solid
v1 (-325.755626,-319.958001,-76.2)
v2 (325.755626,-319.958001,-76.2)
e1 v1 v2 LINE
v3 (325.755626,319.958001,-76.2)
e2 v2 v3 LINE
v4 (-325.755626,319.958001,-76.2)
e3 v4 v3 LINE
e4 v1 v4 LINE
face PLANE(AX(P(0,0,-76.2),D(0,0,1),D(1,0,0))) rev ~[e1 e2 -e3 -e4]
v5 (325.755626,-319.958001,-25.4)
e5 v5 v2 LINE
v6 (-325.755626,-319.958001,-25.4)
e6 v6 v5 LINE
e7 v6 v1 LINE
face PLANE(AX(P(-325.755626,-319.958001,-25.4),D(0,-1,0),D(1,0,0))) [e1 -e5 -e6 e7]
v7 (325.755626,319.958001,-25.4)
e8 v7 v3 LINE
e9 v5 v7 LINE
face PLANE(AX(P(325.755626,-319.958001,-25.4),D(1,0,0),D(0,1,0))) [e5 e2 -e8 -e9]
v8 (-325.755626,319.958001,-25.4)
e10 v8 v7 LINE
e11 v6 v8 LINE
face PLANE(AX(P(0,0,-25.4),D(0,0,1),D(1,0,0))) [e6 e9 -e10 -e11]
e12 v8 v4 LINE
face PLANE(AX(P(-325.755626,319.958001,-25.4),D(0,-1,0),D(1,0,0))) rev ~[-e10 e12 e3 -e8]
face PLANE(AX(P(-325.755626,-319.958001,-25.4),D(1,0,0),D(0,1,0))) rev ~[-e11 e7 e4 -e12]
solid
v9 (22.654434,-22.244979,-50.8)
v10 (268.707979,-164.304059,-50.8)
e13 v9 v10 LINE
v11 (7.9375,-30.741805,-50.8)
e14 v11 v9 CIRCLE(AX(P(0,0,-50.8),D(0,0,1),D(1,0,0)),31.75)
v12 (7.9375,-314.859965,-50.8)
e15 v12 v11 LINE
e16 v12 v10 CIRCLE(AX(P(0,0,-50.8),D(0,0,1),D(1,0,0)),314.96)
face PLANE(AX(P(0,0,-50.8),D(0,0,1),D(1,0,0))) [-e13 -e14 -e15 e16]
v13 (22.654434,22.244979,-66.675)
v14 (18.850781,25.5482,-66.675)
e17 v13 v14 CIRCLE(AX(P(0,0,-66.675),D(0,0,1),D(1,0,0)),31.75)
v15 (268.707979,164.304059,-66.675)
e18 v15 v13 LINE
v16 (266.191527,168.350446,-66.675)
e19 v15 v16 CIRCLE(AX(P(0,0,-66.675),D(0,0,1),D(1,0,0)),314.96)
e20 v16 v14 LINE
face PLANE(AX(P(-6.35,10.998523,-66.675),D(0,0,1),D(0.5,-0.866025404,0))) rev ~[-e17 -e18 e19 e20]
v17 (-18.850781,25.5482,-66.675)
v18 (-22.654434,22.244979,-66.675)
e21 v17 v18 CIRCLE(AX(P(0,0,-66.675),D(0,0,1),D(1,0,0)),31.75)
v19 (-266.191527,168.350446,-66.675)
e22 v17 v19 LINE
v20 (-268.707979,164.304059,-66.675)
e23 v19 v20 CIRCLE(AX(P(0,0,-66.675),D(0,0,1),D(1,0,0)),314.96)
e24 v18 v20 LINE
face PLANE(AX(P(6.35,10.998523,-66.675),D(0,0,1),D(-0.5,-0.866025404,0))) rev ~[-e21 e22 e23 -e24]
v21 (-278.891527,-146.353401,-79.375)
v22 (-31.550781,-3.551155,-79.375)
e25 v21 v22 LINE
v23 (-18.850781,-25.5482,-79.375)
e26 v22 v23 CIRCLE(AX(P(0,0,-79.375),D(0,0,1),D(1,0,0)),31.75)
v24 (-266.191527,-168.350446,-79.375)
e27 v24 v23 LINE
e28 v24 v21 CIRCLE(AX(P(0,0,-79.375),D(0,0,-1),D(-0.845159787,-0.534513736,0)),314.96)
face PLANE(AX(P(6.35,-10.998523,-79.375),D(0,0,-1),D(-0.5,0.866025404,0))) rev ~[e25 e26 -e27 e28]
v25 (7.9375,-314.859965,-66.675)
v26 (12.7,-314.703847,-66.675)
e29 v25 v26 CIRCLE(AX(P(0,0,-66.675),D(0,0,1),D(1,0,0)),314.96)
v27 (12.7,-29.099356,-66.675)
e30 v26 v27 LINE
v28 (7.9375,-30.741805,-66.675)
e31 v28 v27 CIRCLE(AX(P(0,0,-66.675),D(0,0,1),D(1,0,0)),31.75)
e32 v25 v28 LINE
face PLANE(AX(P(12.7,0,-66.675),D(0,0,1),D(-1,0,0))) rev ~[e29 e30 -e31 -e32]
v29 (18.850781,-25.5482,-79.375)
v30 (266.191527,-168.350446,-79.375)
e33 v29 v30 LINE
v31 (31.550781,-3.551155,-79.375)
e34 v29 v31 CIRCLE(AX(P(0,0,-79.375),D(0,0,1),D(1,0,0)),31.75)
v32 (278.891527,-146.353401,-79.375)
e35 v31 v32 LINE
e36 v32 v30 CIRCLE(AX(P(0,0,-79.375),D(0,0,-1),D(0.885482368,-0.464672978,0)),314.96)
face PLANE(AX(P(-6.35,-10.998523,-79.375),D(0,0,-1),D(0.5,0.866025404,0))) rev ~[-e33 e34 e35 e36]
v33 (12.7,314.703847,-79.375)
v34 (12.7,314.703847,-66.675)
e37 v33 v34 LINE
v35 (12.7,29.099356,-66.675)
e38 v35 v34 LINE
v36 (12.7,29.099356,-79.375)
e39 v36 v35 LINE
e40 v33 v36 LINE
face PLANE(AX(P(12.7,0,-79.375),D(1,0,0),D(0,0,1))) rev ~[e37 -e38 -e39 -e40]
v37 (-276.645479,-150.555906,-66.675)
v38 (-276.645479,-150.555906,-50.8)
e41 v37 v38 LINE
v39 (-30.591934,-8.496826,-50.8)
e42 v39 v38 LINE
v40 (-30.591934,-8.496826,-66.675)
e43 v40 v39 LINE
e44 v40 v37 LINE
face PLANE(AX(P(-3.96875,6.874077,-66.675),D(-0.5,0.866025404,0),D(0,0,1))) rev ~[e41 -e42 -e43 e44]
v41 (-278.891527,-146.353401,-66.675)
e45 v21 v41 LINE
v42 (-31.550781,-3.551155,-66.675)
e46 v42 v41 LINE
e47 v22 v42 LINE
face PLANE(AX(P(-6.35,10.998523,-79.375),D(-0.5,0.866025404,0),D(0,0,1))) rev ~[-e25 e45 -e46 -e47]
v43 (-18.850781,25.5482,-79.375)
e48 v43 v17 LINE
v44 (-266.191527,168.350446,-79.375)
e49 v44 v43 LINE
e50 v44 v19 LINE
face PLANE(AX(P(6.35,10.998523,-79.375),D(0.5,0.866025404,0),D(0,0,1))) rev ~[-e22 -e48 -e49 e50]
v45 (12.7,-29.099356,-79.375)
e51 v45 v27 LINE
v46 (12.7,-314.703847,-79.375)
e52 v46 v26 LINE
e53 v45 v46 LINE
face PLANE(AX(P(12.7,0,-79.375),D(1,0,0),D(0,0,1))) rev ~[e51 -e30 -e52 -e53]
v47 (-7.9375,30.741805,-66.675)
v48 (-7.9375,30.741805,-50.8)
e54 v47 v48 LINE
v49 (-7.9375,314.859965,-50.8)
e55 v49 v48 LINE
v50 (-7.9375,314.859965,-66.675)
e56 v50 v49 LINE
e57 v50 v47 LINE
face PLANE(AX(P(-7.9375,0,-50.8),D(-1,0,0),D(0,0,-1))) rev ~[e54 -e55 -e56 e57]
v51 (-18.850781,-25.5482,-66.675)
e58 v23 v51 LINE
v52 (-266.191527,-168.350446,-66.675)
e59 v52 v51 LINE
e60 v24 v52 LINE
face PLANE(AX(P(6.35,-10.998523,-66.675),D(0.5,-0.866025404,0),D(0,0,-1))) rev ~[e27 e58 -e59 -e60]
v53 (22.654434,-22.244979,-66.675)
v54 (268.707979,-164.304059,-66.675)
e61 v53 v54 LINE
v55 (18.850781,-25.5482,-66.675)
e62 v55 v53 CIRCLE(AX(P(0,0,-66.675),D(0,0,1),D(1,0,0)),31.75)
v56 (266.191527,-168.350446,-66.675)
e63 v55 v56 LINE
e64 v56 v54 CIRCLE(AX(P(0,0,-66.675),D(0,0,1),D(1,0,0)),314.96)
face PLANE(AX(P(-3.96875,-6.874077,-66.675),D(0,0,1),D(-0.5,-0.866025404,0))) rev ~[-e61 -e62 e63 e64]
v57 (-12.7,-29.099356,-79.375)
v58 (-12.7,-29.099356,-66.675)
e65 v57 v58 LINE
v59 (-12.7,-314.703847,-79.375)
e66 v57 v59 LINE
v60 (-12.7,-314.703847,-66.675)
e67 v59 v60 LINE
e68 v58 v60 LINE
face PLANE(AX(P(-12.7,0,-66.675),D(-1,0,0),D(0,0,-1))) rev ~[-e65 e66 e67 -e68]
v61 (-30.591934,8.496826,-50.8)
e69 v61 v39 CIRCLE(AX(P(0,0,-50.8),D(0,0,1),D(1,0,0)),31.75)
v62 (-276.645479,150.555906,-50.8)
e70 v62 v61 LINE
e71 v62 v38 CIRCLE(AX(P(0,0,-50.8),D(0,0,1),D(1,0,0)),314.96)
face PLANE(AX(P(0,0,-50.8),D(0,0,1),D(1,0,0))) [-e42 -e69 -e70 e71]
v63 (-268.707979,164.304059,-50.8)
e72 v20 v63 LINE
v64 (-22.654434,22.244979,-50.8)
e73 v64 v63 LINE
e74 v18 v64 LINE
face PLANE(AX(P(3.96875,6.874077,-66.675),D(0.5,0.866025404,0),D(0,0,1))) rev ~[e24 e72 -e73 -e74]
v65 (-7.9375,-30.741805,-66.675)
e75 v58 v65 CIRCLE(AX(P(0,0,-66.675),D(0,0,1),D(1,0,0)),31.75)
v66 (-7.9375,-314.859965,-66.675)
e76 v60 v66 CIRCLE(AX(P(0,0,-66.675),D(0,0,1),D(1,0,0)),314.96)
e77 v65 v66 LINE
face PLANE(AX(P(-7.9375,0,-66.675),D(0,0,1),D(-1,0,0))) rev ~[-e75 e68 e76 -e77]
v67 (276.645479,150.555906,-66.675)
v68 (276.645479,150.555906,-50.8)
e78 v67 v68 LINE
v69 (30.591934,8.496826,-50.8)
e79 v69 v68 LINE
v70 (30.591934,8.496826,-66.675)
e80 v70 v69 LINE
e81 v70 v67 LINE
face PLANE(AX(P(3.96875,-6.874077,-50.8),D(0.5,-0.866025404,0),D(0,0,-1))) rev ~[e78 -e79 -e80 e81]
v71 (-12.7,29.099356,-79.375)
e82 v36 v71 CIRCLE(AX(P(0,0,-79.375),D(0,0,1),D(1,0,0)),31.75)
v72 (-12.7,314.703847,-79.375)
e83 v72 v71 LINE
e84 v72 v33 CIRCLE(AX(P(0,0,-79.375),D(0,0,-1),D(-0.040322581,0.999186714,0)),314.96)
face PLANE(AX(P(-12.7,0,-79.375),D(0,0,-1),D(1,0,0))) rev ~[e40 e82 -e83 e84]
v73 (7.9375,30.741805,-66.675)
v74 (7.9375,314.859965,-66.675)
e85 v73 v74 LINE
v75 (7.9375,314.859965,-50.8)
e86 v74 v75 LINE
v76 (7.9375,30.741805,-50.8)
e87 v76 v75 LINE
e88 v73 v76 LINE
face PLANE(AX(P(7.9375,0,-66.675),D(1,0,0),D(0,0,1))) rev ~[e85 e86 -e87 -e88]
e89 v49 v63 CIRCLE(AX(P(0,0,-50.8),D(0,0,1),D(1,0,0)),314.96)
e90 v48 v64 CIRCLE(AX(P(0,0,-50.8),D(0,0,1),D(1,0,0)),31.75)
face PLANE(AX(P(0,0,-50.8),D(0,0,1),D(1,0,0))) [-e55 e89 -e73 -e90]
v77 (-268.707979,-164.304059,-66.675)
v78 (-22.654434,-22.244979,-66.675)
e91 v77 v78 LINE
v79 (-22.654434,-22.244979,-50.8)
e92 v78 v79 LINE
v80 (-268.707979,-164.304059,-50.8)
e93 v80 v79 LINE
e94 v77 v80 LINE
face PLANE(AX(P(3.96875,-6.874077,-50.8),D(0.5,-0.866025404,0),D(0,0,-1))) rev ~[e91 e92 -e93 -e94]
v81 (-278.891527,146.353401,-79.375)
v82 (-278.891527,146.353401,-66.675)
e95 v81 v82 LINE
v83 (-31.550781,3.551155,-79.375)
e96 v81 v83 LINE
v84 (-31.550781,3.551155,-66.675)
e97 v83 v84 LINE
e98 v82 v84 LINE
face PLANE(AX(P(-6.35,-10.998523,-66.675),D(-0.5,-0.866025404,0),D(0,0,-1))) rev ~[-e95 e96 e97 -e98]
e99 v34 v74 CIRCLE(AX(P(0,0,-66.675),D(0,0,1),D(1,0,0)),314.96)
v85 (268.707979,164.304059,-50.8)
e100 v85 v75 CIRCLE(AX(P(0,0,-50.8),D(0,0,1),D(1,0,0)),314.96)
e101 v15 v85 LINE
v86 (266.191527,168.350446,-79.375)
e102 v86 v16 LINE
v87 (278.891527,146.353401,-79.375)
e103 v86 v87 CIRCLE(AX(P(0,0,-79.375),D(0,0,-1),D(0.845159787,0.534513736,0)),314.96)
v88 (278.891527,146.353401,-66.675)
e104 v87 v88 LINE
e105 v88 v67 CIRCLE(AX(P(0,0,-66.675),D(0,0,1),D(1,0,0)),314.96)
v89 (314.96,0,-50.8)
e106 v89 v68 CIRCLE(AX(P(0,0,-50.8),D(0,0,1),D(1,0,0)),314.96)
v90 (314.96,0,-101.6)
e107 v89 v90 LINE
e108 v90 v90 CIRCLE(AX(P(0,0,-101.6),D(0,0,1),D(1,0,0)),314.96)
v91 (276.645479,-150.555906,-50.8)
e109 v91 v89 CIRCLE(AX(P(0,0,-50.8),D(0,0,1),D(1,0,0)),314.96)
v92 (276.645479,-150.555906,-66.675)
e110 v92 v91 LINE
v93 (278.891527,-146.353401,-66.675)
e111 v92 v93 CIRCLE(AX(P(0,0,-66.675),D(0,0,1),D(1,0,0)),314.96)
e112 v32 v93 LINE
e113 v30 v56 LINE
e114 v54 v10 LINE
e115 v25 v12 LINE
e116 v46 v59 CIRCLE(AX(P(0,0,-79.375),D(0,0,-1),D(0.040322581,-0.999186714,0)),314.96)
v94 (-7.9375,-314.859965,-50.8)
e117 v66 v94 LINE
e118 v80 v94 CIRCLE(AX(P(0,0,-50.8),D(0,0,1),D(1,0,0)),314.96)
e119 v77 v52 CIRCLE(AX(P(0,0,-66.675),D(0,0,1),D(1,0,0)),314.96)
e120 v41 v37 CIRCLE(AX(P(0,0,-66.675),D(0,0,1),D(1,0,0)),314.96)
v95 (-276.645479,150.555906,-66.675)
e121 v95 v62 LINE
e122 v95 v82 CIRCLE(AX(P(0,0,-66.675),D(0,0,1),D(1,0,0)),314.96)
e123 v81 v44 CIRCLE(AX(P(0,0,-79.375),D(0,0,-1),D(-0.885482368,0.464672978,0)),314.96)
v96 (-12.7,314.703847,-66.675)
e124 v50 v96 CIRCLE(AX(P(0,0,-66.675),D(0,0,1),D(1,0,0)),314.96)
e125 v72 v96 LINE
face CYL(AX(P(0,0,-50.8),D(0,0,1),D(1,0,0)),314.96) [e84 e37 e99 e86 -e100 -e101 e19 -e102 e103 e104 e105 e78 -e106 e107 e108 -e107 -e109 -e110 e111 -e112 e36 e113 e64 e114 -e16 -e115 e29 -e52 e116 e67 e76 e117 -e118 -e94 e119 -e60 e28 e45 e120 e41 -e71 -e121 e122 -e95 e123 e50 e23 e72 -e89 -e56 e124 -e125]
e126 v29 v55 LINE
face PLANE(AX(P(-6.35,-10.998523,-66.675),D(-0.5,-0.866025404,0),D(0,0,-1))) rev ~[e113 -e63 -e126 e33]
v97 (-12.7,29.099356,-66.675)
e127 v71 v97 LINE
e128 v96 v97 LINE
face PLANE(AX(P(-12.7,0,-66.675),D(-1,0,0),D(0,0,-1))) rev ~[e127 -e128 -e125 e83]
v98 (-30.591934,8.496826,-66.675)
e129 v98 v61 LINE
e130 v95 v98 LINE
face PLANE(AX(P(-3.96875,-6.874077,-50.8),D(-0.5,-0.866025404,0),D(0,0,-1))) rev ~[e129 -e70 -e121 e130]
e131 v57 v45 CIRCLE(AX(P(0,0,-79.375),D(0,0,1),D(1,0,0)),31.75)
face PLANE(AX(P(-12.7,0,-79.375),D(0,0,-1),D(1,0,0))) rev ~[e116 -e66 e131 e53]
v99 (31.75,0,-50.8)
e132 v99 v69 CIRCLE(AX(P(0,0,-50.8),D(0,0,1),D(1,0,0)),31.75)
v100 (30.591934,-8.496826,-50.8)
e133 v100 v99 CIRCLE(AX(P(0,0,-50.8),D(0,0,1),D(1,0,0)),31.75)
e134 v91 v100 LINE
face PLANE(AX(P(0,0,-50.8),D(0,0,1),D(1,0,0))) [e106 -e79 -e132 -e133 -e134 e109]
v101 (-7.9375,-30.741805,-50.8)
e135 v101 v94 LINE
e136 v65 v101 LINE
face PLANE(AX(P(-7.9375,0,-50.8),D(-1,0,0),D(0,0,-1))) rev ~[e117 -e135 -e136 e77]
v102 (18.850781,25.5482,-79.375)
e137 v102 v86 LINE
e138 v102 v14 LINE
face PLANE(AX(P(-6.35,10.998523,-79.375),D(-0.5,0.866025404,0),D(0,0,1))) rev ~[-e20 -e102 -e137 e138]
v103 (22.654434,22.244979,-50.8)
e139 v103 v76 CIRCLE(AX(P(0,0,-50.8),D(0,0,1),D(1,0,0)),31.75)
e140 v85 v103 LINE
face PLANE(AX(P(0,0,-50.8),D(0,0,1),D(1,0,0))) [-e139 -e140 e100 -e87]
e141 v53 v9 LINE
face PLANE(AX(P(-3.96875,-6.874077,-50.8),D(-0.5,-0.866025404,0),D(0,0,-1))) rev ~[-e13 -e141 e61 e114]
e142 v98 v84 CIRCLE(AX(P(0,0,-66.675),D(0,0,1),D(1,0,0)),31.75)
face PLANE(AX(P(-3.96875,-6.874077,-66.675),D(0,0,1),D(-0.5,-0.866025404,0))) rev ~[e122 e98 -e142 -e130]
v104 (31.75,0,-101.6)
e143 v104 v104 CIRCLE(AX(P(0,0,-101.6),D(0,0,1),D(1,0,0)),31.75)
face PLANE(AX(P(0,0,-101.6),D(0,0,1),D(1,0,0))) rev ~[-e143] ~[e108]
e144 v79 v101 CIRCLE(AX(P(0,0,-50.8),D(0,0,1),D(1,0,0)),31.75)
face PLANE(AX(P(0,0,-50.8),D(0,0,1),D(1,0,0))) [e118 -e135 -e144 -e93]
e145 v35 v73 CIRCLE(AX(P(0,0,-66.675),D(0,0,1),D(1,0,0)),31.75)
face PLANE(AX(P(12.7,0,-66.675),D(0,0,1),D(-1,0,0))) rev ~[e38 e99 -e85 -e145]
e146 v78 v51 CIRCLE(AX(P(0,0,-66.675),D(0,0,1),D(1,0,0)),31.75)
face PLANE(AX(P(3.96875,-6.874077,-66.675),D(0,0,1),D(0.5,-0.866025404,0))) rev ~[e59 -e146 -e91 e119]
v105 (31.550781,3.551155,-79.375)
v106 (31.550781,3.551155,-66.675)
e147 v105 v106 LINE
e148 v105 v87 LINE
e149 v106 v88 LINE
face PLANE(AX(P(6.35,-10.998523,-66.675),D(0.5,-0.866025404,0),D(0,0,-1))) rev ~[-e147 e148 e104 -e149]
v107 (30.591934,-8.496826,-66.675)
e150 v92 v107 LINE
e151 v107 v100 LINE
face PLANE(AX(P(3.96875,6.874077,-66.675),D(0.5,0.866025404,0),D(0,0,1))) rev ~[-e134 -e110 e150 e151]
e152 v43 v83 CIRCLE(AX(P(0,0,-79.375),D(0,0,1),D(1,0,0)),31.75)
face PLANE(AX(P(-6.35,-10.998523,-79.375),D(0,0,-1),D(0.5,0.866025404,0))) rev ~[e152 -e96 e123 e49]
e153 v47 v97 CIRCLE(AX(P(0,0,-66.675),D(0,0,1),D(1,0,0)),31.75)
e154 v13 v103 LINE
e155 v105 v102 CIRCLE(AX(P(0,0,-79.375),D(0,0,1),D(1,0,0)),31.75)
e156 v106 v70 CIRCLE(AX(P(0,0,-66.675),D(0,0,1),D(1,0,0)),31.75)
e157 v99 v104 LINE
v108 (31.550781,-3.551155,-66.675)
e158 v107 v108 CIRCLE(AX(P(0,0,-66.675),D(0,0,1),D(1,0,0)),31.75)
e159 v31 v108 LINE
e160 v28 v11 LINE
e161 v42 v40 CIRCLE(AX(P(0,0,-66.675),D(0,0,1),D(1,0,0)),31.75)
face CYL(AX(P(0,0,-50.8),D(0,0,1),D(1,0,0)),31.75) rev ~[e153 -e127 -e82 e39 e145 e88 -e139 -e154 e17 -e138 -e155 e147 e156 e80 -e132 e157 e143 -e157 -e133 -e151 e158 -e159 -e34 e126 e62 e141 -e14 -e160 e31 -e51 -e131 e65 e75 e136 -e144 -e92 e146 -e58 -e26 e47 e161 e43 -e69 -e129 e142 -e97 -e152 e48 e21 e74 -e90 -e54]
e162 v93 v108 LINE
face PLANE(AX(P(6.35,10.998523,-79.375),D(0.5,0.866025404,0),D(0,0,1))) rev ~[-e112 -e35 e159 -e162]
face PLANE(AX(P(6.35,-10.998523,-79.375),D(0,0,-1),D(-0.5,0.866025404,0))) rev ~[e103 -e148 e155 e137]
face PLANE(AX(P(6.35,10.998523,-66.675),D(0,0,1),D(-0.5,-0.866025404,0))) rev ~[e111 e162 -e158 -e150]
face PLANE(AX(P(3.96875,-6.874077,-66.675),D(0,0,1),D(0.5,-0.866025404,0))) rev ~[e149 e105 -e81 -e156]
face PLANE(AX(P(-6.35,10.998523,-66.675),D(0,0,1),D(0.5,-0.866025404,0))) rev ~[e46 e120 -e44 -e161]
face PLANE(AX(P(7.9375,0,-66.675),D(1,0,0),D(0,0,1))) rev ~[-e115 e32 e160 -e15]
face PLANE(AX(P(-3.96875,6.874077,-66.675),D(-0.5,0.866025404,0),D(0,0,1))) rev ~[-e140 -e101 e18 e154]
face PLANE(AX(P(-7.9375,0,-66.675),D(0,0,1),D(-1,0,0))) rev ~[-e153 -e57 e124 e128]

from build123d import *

# Parameters (mm, degrees)
F1_START        = -50.8
F0_R            = 314.96
F0_R_2          = 31.75
F1_DEPTH        = 50.8
F3_DEPTH        = 314.96
F3_COPIES_COUNT = 3
F3_COPIES_ANGLE = 120
F5_START        = -25.4
F4_W            = 651.5112519264
F4_H            = 639.9160027504
F5_DEPTH        = 50.8


# Not quite as in the source:
# - a pattern or mirror of a feature is missing from the dataset's text; its kind, count and spacing are read off the source's solid


with BuildPart() as f1:
    # F0 (on Top) → F1 (new body)
    with BuildSketch(Plane.XY.offset(F1_START)):
        Circle(F0_R)
        Circle(F0_R_2, mode=Mode.SUBTRACT)
    extrude(amount=-F1_DEPTH)

    # F2 (on Front) → F3 (cut, symmetric)
    with BuildSketch(Plane.XZ):
        Polygon((7.9375, -50.8), (0, -50.8), (-7.9375, -50.8), (-7.9375, -66.675), (-12.7, -66.675), (-12.7, -79.375), (0, -79.375), (12.7, -79.375), (12.7, -66.675), (7.9375, -66.675), align=None)
    f3 = extrude(amount=F3_DEPTH, both=True, mode=Mode.SUBTRACT)

    # F3_copies: F3 ×3 about axis
    f3_copies_axis = Axis((0, 0, 0), (0, 0, 1))
    for i in range(1, F3_COPIES_COUNT):
        add(f3.rotate(f3_copies_axis, i * F3_COPIES_ANGLE / (F3_COPIES_COUNT - 1)), mode=Mode.SUBTRACT)


with BuildPart() as f5:
    # F4 (on Top) → F5 (new body)
    with BuildSketch(Plane.XY.offset(F5_START)):
        Rectangle(F4_W, F4_H)
    extrude(amount=-F5_DEPTH)


solid = Compound([f1.part, f5.part])
